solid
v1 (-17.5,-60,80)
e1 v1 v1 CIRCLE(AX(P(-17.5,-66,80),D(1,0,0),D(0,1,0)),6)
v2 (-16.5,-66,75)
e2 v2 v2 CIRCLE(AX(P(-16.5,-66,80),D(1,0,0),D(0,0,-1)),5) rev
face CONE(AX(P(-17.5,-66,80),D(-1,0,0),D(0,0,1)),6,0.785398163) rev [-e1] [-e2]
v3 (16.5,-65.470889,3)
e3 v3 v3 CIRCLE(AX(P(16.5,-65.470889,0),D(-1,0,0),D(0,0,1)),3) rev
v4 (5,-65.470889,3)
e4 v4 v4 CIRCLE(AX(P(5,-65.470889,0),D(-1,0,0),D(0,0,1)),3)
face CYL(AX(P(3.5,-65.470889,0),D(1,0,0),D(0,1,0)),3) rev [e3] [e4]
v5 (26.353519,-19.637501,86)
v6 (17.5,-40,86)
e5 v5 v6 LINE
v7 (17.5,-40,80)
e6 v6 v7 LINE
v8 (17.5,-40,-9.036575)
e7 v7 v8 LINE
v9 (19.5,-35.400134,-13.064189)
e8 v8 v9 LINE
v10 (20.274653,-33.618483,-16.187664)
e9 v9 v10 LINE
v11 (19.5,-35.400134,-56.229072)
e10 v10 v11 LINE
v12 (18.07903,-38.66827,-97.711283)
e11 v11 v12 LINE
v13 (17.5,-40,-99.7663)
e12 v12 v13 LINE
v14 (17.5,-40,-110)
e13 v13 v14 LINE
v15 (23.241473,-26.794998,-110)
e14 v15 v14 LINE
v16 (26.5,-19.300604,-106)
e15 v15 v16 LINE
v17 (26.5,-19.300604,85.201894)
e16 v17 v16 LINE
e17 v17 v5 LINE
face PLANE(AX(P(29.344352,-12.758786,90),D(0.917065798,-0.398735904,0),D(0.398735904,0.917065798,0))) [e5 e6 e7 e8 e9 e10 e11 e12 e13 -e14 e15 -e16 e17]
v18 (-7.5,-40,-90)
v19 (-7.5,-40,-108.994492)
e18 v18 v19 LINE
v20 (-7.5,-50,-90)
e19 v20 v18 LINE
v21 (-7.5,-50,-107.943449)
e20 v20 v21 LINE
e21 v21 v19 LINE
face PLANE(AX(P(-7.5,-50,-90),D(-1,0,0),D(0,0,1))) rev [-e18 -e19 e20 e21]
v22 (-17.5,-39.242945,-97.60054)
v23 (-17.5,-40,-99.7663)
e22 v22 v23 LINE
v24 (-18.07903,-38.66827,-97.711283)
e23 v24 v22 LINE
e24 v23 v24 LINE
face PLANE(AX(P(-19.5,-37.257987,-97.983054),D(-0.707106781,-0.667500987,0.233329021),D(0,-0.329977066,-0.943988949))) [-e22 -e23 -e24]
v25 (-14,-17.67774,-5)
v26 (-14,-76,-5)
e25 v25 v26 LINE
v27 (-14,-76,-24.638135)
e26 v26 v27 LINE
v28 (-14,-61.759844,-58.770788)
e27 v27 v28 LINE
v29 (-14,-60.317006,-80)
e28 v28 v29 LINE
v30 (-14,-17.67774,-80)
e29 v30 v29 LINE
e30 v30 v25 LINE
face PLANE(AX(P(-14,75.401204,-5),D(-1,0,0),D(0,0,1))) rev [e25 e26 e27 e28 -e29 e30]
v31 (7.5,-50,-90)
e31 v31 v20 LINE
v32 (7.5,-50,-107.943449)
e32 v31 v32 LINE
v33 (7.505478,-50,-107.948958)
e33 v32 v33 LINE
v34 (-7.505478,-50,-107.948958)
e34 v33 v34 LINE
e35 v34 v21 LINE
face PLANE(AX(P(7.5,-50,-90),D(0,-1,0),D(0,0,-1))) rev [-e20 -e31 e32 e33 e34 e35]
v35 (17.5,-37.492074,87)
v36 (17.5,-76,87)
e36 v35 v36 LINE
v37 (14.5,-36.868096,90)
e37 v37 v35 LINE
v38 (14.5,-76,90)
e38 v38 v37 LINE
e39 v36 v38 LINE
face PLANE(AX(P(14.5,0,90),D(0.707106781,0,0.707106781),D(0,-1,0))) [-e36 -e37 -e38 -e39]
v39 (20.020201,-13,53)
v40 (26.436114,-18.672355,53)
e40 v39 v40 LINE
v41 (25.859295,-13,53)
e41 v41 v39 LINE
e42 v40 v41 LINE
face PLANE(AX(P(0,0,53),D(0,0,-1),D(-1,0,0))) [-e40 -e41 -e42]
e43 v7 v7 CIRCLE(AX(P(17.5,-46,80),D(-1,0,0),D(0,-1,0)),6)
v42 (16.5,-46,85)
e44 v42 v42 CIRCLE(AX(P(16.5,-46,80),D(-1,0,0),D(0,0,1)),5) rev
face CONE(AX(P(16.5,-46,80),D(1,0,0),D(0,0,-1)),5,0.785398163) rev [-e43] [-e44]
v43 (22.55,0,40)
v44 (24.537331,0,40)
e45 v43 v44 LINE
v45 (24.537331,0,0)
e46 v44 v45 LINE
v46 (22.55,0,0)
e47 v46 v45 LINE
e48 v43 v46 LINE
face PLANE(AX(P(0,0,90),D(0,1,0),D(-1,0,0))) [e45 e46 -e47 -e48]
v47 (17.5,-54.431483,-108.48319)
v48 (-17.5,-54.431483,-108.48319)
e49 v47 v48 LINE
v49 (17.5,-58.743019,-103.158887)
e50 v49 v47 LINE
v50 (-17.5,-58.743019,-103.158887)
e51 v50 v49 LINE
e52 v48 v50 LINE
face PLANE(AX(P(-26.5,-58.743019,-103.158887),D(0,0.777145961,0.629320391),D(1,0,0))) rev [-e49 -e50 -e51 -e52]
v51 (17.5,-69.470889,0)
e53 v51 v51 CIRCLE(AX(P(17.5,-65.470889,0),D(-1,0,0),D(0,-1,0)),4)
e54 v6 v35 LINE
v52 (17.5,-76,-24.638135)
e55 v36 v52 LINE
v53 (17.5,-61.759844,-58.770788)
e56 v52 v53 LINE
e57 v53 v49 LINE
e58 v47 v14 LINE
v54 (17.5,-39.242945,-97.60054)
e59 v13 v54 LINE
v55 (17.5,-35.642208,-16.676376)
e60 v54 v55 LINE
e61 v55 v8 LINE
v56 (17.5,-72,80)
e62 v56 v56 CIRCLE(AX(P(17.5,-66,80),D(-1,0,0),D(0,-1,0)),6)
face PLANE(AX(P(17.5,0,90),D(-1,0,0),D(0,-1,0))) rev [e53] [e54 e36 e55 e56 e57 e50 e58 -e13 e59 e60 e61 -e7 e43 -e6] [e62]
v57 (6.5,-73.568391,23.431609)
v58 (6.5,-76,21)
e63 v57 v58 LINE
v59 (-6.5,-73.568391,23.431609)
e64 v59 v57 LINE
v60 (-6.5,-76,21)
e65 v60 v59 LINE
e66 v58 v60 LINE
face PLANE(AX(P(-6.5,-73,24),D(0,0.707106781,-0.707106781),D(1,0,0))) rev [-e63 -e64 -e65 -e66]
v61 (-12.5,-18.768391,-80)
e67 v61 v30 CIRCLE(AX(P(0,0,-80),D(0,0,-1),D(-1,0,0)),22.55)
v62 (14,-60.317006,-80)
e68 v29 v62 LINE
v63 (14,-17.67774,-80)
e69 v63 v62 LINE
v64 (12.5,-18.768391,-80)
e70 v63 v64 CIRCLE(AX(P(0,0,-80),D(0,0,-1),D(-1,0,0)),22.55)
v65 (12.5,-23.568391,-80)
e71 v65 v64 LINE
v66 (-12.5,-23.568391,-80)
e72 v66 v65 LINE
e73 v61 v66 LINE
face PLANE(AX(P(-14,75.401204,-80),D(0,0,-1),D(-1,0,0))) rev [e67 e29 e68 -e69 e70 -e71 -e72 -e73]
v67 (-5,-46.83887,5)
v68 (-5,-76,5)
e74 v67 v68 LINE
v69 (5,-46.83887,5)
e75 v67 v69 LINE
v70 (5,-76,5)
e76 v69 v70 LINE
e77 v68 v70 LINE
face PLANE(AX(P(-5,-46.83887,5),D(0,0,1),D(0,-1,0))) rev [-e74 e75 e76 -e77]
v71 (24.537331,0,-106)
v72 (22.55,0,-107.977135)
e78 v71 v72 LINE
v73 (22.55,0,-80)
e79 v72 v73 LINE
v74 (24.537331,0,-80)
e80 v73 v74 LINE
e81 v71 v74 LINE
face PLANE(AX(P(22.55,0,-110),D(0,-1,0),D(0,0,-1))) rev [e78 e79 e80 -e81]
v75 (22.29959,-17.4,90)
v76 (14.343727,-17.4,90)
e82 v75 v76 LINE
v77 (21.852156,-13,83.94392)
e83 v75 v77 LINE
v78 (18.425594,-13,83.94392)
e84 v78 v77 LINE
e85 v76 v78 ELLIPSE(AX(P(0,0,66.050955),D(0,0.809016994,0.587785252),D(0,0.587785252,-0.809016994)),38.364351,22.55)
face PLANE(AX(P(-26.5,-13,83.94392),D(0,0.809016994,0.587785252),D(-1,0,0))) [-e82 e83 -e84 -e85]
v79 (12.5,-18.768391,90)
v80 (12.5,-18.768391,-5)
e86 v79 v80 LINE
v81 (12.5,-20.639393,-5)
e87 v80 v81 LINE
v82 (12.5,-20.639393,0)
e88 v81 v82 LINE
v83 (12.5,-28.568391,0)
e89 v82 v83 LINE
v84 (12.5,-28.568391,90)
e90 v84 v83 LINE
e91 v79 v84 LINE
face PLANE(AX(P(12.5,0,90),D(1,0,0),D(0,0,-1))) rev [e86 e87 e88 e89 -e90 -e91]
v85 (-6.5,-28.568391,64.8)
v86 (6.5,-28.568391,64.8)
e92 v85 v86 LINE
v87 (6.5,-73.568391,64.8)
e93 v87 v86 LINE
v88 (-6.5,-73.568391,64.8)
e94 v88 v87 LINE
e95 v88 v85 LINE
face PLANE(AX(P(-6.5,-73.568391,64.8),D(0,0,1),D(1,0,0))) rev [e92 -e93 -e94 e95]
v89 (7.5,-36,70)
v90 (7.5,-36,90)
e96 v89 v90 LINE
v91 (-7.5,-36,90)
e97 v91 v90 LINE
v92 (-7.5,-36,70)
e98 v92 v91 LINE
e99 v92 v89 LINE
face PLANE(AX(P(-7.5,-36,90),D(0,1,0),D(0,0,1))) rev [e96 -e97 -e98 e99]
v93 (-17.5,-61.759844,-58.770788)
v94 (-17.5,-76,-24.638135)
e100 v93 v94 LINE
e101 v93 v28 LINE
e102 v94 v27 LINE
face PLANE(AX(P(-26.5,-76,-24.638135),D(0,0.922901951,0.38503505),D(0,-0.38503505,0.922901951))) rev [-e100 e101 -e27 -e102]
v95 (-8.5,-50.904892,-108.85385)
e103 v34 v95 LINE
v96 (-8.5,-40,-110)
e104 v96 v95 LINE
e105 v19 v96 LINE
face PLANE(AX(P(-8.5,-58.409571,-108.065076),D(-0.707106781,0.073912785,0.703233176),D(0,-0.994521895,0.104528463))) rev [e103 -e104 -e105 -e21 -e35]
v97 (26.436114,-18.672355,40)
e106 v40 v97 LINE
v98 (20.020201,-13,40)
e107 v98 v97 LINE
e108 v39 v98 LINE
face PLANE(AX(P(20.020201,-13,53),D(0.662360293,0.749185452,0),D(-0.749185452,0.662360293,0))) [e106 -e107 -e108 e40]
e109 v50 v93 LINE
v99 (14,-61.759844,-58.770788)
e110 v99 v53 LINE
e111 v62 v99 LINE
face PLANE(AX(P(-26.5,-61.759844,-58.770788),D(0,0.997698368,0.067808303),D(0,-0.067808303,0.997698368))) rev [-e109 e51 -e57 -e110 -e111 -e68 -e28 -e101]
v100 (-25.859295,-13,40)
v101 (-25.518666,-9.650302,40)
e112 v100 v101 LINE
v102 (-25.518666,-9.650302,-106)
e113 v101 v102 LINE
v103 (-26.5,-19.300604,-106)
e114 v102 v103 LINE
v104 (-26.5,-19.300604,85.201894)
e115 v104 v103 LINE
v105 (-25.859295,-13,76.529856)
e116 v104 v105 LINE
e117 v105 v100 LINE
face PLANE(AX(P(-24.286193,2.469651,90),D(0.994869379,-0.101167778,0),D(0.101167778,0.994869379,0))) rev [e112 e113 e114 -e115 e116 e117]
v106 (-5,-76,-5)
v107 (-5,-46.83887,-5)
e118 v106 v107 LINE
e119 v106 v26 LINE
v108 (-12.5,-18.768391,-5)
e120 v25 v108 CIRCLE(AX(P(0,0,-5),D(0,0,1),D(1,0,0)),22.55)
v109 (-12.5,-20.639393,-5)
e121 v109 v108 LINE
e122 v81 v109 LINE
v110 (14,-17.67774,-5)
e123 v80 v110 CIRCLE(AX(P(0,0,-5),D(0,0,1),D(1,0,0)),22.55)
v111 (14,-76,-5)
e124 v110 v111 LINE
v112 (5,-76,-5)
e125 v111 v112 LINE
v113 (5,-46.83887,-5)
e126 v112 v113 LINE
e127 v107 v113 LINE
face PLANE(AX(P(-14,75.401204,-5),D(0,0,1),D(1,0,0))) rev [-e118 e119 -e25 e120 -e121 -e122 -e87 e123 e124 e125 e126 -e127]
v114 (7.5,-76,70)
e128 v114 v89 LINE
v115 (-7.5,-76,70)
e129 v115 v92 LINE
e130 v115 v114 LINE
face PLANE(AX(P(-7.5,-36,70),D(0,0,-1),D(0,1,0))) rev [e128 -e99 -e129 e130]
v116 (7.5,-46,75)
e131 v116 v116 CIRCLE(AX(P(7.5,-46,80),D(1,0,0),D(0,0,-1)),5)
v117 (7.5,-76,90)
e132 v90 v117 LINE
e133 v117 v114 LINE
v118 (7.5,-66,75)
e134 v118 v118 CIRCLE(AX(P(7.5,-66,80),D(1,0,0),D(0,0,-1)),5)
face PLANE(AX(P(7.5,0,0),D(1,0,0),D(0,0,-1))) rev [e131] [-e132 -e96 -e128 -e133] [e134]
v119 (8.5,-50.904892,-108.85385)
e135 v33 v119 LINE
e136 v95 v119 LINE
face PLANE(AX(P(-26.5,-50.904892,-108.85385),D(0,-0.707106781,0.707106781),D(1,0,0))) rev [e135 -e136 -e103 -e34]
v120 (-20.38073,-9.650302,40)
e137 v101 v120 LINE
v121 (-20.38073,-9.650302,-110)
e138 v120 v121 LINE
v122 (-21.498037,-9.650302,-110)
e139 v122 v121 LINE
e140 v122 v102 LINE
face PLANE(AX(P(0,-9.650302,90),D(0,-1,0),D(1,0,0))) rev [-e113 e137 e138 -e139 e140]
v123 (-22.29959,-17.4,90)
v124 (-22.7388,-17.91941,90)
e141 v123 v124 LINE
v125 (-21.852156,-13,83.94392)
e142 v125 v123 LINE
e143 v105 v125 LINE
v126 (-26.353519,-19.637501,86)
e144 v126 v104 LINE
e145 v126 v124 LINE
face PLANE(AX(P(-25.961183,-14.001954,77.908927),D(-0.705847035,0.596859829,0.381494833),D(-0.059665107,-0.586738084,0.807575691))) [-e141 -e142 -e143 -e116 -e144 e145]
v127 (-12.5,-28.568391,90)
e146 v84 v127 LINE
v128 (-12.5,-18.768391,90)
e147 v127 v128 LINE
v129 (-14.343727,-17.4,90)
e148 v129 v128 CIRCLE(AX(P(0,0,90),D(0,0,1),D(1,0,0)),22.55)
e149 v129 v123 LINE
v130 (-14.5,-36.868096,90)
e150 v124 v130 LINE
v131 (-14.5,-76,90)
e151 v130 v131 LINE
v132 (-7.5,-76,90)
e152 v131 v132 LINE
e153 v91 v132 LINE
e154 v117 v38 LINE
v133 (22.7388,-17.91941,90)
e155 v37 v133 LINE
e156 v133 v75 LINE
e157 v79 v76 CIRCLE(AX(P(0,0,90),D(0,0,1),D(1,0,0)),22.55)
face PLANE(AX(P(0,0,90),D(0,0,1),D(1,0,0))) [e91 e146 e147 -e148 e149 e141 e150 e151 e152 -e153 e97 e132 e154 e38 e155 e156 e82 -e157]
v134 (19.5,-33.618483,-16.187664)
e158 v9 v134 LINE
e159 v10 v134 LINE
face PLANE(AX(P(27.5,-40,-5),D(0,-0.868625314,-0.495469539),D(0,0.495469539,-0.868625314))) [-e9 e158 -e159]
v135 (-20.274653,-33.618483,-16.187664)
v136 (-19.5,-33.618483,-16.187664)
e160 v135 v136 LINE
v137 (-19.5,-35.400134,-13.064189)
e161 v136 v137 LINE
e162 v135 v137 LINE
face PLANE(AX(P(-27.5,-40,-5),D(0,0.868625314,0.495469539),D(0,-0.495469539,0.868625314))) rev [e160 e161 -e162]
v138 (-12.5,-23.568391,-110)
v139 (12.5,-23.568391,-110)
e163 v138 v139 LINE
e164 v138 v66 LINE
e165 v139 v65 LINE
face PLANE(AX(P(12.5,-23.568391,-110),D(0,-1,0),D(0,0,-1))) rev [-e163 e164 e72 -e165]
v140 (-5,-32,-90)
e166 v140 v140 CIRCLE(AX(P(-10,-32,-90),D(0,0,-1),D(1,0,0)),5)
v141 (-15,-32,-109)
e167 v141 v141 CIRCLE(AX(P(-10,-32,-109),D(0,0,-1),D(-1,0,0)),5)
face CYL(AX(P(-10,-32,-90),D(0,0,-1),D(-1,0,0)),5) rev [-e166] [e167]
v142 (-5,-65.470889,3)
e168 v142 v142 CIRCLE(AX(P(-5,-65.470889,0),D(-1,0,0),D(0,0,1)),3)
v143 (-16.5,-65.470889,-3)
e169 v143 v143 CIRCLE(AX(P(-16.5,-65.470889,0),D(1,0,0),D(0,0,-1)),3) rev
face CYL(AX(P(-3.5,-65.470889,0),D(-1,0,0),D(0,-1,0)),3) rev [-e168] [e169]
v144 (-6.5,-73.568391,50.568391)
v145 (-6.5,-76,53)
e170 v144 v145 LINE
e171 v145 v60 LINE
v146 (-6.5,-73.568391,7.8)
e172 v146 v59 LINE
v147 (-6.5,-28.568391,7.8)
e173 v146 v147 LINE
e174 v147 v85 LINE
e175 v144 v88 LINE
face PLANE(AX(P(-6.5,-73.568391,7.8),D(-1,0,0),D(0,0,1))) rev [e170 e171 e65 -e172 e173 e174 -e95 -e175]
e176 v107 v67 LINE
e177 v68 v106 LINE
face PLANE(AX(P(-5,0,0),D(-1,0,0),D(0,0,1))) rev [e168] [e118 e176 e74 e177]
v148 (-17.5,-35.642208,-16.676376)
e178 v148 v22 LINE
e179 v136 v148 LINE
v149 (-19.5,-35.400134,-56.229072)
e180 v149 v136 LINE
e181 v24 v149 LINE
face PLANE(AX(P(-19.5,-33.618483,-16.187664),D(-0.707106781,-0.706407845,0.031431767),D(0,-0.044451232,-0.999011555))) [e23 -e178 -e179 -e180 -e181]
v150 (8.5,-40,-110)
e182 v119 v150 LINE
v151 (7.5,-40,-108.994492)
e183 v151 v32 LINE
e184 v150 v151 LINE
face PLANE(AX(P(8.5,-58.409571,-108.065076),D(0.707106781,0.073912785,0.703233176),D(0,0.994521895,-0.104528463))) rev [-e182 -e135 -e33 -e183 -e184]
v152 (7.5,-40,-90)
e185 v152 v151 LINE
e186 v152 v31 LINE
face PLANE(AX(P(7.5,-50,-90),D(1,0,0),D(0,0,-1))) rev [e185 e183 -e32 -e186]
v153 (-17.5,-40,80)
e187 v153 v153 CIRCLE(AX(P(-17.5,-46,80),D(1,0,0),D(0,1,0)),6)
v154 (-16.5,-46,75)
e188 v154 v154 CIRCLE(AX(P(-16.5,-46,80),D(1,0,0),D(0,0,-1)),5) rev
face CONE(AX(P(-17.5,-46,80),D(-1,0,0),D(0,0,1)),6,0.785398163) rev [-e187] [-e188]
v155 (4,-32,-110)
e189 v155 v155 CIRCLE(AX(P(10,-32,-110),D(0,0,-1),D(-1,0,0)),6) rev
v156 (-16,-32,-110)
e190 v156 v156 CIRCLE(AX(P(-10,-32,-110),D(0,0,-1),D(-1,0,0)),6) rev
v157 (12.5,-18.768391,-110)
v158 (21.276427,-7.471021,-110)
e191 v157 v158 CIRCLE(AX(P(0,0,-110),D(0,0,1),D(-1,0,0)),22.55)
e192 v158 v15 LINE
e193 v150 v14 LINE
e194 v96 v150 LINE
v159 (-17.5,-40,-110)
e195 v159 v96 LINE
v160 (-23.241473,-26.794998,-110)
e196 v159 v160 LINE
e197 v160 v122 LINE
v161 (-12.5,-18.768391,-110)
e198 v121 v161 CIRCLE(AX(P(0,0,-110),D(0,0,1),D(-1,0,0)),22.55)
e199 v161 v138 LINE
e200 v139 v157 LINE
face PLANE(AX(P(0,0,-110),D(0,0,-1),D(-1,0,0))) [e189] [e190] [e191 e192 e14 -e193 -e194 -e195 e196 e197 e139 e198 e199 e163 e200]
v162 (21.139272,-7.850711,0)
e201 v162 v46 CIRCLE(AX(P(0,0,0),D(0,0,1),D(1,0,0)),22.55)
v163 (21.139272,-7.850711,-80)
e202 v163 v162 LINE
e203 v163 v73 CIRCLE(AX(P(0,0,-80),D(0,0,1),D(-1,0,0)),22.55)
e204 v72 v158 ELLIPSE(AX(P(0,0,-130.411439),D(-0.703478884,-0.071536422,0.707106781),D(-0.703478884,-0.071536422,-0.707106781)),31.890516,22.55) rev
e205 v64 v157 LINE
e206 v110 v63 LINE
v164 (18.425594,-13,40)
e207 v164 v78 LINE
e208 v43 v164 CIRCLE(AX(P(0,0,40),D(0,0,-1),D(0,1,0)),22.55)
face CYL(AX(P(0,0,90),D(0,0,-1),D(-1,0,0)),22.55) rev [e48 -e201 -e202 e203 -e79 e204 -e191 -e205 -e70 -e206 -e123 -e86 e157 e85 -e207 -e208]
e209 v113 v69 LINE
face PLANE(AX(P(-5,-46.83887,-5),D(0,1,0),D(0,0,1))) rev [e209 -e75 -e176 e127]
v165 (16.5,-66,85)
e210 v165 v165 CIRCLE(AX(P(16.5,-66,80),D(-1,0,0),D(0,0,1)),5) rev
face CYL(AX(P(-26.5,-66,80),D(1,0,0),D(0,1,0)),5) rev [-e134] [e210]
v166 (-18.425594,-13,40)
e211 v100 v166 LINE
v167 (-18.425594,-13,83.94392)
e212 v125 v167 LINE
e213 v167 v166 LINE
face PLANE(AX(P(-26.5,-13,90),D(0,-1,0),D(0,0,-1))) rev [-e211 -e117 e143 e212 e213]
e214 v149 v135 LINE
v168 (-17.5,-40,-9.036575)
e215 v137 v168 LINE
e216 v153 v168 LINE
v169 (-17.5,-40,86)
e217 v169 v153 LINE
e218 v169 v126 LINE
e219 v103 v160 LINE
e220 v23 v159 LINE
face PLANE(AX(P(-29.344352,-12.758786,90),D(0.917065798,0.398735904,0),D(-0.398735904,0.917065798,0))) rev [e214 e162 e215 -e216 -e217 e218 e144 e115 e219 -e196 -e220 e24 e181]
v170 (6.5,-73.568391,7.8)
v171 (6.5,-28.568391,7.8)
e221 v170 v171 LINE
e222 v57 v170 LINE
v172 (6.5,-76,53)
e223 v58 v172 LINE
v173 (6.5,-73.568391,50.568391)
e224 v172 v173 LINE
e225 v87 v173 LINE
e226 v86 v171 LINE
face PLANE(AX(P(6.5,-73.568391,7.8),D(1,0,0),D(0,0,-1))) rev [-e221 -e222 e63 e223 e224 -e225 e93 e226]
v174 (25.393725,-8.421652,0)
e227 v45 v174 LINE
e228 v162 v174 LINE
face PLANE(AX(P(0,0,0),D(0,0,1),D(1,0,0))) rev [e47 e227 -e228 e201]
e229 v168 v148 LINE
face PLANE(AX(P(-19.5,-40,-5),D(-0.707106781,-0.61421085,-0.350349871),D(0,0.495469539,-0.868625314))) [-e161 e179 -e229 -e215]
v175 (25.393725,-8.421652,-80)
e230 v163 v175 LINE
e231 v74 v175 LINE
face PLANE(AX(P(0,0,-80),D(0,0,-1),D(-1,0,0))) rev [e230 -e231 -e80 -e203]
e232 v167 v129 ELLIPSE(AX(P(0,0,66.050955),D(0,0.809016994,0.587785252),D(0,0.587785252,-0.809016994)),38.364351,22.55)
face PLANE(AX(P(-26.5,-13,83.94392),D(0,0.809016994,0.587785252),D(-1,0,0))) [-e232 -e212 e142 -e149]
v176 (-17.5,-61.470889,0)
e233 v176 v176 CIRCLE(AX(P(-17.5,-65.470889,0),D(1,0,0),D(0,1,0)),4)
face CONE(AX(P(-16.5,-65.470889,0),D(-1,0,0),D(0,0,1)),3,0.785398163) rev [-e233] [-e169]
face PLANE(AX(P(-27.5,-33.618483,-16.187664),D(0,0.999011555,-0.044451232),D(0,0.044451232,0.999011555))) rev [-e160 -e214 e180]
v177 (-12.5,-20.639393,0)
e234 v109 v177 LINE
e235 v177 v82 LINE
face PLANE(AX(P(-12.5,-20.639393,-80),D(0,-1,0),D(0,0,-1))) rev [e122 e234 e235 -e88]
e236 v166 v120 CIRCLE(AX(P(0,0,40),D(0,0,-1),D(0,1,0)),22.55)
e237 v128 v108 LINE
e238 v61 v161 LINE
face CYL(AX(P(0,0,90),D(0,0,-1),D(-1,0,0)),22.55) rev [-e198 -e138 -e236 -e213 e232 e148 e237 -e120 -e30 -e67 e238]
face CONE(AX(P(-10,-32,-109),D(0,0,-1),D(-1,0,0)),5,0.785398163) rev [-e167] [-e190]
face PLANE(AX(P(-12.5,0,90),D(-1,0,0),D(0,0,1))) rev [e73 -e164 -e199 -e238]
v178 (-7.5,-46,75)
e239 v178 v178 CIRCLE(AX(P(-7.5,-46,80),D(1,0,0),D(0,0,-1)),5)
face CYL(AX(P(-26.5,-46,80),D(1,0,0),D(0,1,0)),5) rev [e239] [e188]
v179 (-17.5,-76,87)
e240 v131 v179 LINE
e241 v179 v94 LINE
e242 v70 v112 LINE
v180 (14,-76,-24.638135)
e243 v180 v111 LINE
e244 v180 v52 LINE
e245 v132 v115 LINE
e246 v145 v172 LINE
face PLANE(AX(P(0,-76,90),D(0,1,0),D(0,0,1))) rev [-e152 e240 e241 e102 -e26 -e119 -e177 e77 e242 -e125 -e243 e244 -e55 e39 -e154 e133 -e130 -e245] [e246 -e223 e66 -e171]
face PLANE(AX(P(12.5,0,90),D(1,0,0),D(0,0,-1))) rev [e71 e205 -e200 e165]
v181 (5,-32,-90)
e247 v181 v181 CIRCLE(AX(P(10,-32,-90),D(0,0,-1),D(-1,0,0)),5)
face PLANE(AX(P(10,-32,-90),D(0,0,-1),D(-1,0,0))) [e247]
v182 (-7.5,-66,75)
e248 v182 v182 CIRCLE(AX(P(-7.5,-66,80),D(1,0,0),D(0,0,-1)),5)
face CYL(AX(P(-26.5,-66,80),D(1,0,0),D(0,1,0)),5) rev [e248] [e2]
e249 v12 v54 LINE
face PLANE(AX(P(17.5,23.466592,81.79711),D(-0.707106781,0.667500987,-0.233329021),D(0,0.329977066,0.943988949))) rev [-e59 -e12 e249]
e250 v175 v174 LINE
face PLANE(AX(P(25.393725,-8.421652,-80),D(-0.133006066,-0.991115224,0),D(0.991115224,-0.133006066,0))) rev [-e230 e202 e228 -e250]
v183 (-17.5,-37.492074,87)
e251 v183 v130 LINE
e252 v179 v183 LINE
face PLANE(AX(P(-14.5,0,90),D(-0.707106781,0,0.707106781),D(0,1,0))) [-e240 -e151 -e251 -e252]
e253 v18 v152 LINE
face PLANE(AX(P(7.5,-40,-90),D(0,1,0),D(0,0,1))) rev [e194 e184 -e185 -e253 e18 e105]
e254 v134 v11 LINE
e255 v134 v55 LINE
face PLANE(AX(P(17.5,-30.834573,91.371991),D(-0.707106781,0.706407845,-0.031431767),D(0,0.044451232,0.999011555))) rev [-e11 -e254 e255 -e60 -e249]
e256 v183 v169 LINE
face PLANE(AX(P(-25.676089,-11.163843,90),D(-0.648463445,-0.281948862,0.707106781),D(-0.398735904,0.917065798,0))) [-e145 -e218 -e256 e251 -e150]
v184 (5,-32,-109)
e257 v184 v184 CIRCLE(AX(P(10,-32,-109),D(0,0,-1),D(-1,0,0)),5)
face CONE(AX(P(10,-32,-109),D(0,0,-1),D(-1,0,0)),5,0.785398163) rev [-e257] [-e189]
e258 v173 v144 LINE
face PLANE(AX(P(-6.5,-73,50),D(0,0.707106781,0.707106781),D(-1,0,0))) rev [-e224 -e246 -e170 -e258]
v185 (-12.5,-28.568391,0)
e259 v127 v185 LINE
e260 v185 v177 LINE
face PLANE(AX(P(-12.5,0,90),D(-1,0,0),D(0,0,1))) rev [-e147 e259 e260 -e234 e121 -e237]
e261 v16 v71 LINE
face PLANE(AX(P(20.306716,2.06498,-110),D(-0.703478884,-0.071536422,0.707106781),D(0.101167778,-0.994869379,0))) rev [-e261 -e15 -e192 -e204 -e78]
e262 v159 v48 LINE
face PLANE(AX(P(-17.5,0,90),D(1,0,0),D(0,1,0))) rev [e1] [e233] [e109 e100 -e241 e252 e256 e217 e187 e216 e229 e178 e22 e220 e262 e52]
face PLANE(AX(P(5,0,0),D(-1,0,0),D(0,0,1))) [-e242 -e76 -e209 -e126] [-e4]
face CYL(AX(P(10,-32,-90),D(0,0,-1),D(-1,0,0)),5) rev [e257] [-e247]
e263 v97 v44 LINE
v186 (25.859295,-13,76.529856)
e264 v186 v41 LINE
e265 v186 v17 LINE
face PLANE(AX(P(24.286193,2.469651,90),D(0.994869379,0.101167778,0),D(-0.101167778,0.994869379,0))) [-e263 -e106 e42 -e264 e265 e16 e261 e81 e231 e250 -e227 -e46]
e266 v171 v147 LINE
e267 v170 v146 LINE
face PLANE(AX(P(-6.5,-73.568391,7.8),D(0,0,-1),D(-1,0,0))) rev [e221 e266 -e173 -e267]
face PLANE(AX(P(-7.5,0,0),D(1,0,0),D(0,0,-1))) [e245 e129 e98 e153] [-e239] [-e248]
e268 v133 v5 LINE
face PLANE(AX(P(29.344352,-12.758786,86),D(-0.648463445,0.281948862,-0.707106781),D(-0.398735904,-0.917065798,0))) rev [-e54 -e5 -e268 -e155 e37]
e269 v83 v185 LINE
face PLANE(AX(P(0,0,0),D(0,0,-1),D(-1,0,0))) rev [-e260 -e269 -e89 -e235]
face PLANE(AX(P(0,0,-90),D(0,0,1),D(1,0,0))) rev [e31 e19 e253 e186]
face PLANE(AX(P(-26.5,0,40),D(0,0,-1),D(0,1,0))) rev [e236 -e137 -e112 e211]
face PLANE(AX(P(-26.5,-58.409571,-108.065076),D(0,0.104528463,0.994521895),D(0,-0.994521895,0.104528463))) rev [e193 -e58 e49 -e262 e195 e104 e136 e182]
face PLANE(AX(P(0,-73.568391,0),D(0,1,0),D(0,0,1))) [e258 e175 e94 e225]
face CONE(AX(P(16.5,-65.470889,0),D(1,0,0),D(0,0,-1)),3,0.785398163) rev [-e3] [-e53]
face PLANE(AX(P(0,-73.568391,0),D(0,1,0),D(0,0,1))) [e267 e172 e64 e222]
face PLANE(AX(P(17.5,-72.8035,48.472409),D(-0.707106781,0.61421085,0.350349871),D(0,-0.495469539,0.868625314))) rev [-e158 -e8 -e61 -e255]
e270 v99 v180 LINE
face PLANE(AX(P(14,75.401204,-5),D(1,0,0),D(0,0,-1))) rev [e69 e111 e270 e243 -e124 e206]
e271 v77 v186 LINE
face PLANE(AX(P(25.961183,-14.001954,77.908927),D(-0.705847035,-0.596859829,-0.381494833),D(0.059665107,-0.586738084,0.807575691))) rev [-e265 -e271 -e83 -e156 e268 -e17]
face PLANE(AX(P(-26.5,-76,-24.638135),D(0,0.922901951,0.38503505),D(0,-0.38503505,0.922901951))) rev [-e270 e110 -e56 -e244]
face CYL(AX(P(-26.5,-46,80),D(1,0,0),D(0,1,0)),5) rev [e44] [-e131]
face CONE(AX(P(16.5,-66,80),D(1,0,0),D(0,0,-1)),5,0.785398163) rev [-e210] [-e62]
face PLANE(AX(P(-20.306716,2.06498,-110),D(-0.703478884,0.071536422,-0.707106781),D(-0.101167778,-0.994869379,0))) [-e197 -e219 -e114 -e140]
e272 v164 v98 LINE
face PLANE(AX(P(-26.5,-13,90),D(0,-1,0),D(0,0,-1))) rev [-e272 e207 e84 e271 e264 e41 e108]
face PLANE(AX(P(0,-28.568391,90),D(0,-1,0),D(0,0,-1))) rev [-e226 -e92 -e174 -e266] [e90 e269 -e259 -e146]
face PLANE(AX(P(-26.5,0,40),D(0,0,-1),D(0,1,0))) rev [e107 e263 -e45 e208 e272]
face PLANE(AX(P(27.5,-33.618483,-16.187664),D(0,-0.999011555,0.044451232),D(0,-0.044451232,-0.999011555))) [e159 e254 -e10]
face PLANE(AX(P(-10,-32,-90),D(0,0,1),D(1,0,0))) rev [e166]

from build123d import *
from OCP.BRepFilletAPI import BRepFilletAPI_MakeChamfer

# Parameters (mm, degrees)
EXTRUDE_1_DEPTH           = 90
SKETCH_3_W                = 13
SKETCH_3_H                = 57
CUT_EXTRUDE_1_DEPTH       = 45
CUT_EXTRUDE_2_REACH       = 121.225
SKETCH_4_W                = 13
SKETCH_4_H                = 26
CHAMFER_1_SIZE            = 3
CUT_EXTRUDE_3_DEPTH       = 121.740424051
CUT_EXTRUDE_3_DEPTH_BACK  = 121.740424051
SKETCH_5_W                = 50
SKETCH_5_H                = 13
CUT_EXTRUDE_5_DEPTH       = 13
EXTRUDE_START             = 80
EXTRUDE_3_DEPTH           = 80
EXTRUDE_START_2           = 30
EXTRUDE_4_DEPTH           = 30
CUT_EXTRUDE_7_REACH       = 138.302
SKETCH_13_W               = 28
SKETCH_13_H               = 75
SKETCH_14_W               = 10
SKETCH_14_H               = 29.16112988
CUT_EXTRUDE_8_DEPTH       = 5
SKETCH_15_R               = 2
CUT_EXTRUDE_9_DEPTH       = 141.755106479
SKETCH_16_R               = 3
CUT_EXTRUDE_10_DEPTH      = 14
CUT_EXTRUDE_START         = -14
SKETCH_17_R               = 3
CUT_EXTRUDE_11_DEPTH      = 14
CUT_EXTRUDE_12_DEPTH      = 137.302054277
CUT_EXTRUDE_12_DEPTH_BACK = 137.302054277
CHAMFER_2_SIZE            = 4.4
CHAMFER_2_SIZE2           = 6.05608045
CUT_EXTRUDE_13_DEPTH      = 10
CHAMFER_3_SIZE            = 2
CHAMFER_4_SIZE            = 4
CHAMFER_4_SIZE2           = 4.917507249
CHAMFER_5_SIZE            = 4
CHAMFER_5_EDGE_2_SIZE     = 4
CHAMFER_5_EDGE_3_SIZE     = 4
CHAMFER_5_EDGE_3_SIZE2    = 4.372547618
CHAMFER_5_EDGE_4_SIZE     = 4
CHAMFER_5_EDGE_4_SIZE2    = 4.372547618
CHAMFER_5_EDGE_5_SIZE     = 4
CHAMFER_5_EDGE_6_SIZE     = 4
SKETCH_25_W               = 20
SKETCH_25_H               = 40
CUT_EXTRUDE_14_DEPTH      = 7.5
SKETCH_26_R               = 5
SKETCH_26_W               = 15
SKETCH_26_H               = 10
CUT_EXTRUDE_15_DEPTH      = 20
CHAMFER_6_SIZE            = 1
CHAMFER_6_SIZE2           = 0.909876415
SKETCH_28_R               = 5
CUT_EXTRUDE_16_DEPTH      = 141.755106479
CHAMFER_7_SIZE            = 1
CHAMFER_8_SIZE            = 3


# Some blends are built 0.0001 mm under size
with BuildPart() as part:
    # 스케치2 → 보스-돌출1 (new body)
    with BuildSketch(Plane.XY):
        with BuildLine():
            ThreePointArc((20.380730277, -9.650302243), (17.060788125, -14.745575898), (12.5, -18.768390981))
            Line((12.5, -18.768390981), (12.5, -28.568390981))
            Line((12.5, -28.568390981), (-12.5, -28.568390981))
            Line((-12.5, -28.568390981), (-12.5, -18.768390981))
            ThreePointArc((-12.5, -18.768390981), (-17.060788125, -14.745575898), (-20.380730277, -9.650302243))
            Line((-20.380730277, -9.650302243), (-25.518665511, -9.650302243))
            Line((-25.518665511, -9.650302243), (-26.5, -19.300604486))
            Line((-26.5, -19.300604486), (-17.5, -40))
            Line((-17.5, -40), (-17.5, -76))
            Line((-17.5, -76), (17.5, -76))
            Line((17.5, -76), (17.5, -40))
            Line((17.5, -40), (26.5, -19.300604486))
            Line((26.5, -19.300604486), (24.537331021, 0))
            Line((24.537331021, 0), (22.55, 0))
            ThreePointArc((22.55, 0), (22.000999611, -4.945555189), (20.380730277, -9.650302243))
        make_face()
    extrude(amount=EXTRUDE_1_DEPTH)

    # 스케치3 → 컷-돌출1 (cut)
    with BuildSketch(Plane(origin=(0, -28.568390981, 0), x_dir=(1, 0, 0), z_dir=(0, 1, 0))):
        with Locations((0, -36.3)):
            Rectangle(SKETCH_3_W, SKETCH_3_H)
    extrude(amount=-CUT_EXTRUDE_1_DEPTH, mode=Mode.SUBTRACT)

    # 스케치4 → 컷-돌출2 (cut, up to next)
    with BuildSketch(Plane(origin=(0, -73.568390981, 0), x_dir=(1, 0, 0), z_dir=(0, 1, 0)), mode=Mode.PRIVATE) as cut_extrude_2_sk1:
        with Locations((0, -37)):
            Rectangle(SKETCH_4_W, SKETCH_4_H)
    cut_extrude_2_tool1 = extrude(cut_extrude_2_sk1.sketch, amount=-CUT_EXTRUDE_2_REACH, mode=Mode.PRIVATE) & part.part
    add(cut_extrude_2_tool1.solids().sort_by_distance((0, -73.568391, 37))[0], mode=Mode.SUBTRACT)

    # 모따기1
    # the kernel refuses this chamfer: 3 mm, written as the material it takes off along each edge
    with BuildSketch(Plane(origin=(6.5, -76, 24), x_dir=(0, -0.027495876610586768, -0.9996219169112968), z_dir=(-1, 0, 0)), Plane(origin=(-6.5, -76, 50), x_dir=(0, -0.027495876610586768, 0.9996219169112968), z_dir=(1, 0, 0))) as chamfer_1_piece_1:
        Polygon((CHAMFER_1_SIZE * 0.999621916911, -CHAMFER_1_SIZE * 0.0274958766106), (-CHAMFER_1_SIZE * 0.0274958766106, -CHAMFER_1_SIZE * 0.999621916911), (0, 0), align=None)
    extrude(amount=13, mode=Mode.SUBTRACT)

    # 스케치5 → 컷-돌출3 (cut, two sides: drawn at the far end of the back side and taken through both)
    with BuildSketch(Plane(origin=(0, 0, 0), x_dir=(0, 0, -1), z_dir=(1, 0, 0)).offset(-CUT_EXTRUDE_3_DEPTH_BACK)):
        with Locations((-65, -6.5)):
            Rectangle(SKETCH_5_W, SKETCH_5_H)
    extrude(amount=CUT_EXTRUDE_3_DEPTH + CUT_EXTRUDE_3_DEPTH_BACK, mode=Mode.SUBTRACT)

    # 스케치7 → 컷-돌출5 (cut)
    with BuildSketch(Plane.XY.offset(40)):
        Polygon((20.020200806, -13), (26.436113625, -18.672355064), (25.859294628, -13), align=None)
    extrude(amount=CUT_EXTRUDE_5_DEPTH, mode=Mode.SUBTRACT)

    # 스케치9 → 보스-돌출3 (add)
    with BuildSketch(Plane(origin=(0, 0, 0), x_dir=(-1, 0, 0), z_dir=(0, 0, -1)).offset(EXTRUDE_START)):
        with BuildLine():
            Line((-25.393724686, -8.421652141), (-21.139272206, -7.850711472))
            ThreePointArc((-21.139272206, -7.850711472), (-17.683299751, -13.992977164), (-12.5, -18.768390981))
            Line((-12.5, -18.768390981), (-12.5, -20.639392703))
            Line((-12.5, -20.639392703), (12.5, -20.639392703))
            Line((12.5, -20.639392703), (12.5, -18.768390981))
            ThreePointArc((12.5, -18.768390981), (17.060788125, -14.745575898), (20.380730277, -9.650302243))
            Line((20.380730277, -9.650302243), (25.518665511, -9.650302243))
            Line((25.518665511, -9.650302243), (26.5, -19.300604486))
            Line((26.5, -19.300604486), (17.5, -40))
            Line((17.5, -40), (17.5, -76))
            Line((17.5, -76), (-17.5, -76))
            Line((-17.5, -76), (-17.5, -40))
            Line((-17.5, -40), (-26.5, -19.300604486))
            Line((-26.5, -19.300604486), (-25.393724686, -8.421652141))
        make_face()
    extrude(amount=-EXTRUDE_3_DEPTH)

    # 스케치12 → 보스-돌출4 (add)
    with BuildSketch(Plane(origin=(0, 0, -80), x_dir=(-1, 0, 0), z_dir=(0, 0, -1)).offset(EXTRUDE_START_2)):
        with BuildLine():
            Line((-12.5, -23.568390981), (12.5, -23.568390981))
            Line((12.5, -23.568390981), (12.5, -18.768390981))
            ThreePointArc((12.5, -18.768390981), (17.060788125, -14.745575898), (20.380730277, -9.650302243))
            Line((20.380730277, -9.650302243), (25.518665511, -9.650302243))
            Line((25.518665511, -9.650302243), (26.5, -19.300604486))
            Line((26.5, -19.300604486), (17.5, -40))
            Line((17.5, -40), (17.5, -76))
            Line((17.5, -76), (-17.5, -76))
            Line((-17.5, -76), (-17.5, -40))
            Line((-17.5, -40), (-26.5, -19.300604486))
            Line((-26.5, -19.300604486), (-25.393724686, -8.421652141))
            Line((-25.393724686, -8.421652141), (-24.537331021, 0))
            Line((-24.537331021, 0), (-22.55, 0))
            ThreePointArc((-22.55, 0), (-22.194516082, -3.98822716), (-21.139272206, -7.850711472))
            ThreePointArc((-21.139272206, -7.850711472), (-17.683299751, -13.992977164), (-12.5, -18.768390981))
            Line((-12.5, -18.768390981), (-12.5, -23.568390981))
        make_face()
    extrude(amount=-EXTRUDE_4_DEPTH)

    # 컷-돌출7: up to this face of the body (flat: up to its plane)
    cut_extrude_7_end = Plane(part.part.faces().sort_by_distance((23.266498446, -8.136181806, -40))[0])
    # 스케치13 → 컷-돌출7 (cut, up to the picked face)
    with BuildSketch(Plane.XZ.offset(76), mode=Mode.PRIVATE) as cut_extrude_7_sk1:
        with Locations((0, -42.5)):
            Rectangle(SKETCH_13_W, SKETCH_13_H)
    cut_extrude_7_tool1 = split(extrude(cut_extrude_7_sk1.sketch, amount=-CUT_EXTRUDE_7_REACH, mode=Mode.PRIVATE), bisect_by=cut_extrude_7_end, keep=Keep.BOTH, mode=Mode.PRIVATE)
    add(cut_extrude_7_tool1.solids().sort_by(Axis((0, -76, -42.5), (0, 1, 0)))[0], mode=Mode.SUBTRACT)

    # 스케치14 → 컷-돌출8 (cut, symmetric)
    with BuildSketch(Plane(origin=(0, 0, 0), x_dir=(0, 0, -1), z_dir=(1, 0, 0))):
        with Locations((0, -61.41943506)):
            Rectangle(SKETCH_14_W, SKETCH_14_H)
    extrude(amount=CUT_EXTRUDE_8_DEPTH, both=True, mode=Mode.SUBTRACT)

    # 스케치15 → 컷-돌출9 (cut, through all)
    with BuildSketch(Plane(origin=(17.5, 0, 0), x_dir=(0, 0, -1), z_dir=(1, 0, 0))):
        with Locations(Location((0, -65.470889295, 0), (0, 0, 90))):
            Circle(SKETCH_15_R)
    extrude(amount=-CUT_EXTRUDE_9_DEPTH, mode=Mode.SUBTRACT)

    # 스케치16 → 컷-돌출10 (cut)
    with BuildSketch(Plane(origin=(17.5, 0, 0), x_dir=(0, 0, -1), z_dir=(1, 0, 0))):
        with Locations(Location((0, -65.470889295, 0), (0, 0, 90))):
            Circle(SKETCH_16_R)
    extrude(amount=-CUT_EXTRUDE_10_DEPTH, mode=Mode.SUBTRACT)

    # 스케치17 → 컷-돌출11 (cut)
    with BuildSketch(Plane.ZY.offset(17.5).offset(CUT_EXTRUDE_START)):
        with Locations(Location((0, -65.470889295, 0), (0, 0, 90))):
            Circle(SKETCH_17_R)
    extrude(amount=CUT_EXTRUDE_11_DEPTH, mode=Mode.SUBTRACT)

    # 스케치20 → 컷-돌출12 (cut, two sides: drawn at the far end of the back side and taken through both)
    with BuildSketch(Plane(origin=(0, 0, 0), x_dir=(0, 0, -1), z_dir=(1, 0, 0)).offset(-CUT_EXTRUDE_12_DEPTH_BACK)):
        Polygon((24.638134981, -76), (58.770788474, -61.759843807), (108.06507615, -58.409570701), (110, -40), (110, -58.885675635), (110, -79), align=None)
    extrude(amount=CUT_EXTRUDE_12_DEPTH + CUT_EXTRUDE_12_DEPTH_BACK, mode=Mode.SUBTRACT)

    # 모따기2
    chamfer_2_edges = [part.edges().sort_by_distance(p)[0] for p in [
        (22.142444121, -13, 90),
        (-22.142444121, -13, 90),
    ]]
    chamfer_2_side = [part.faces().sort_by_distance(p)[0] for p in [
        (0, -46.360145524, 90),
    ]]
    chamfer(chamfer_2_edges, length=CHAMFER_2_SIZE, length2=CHAMFER_2_SIZE2, reference=chamfer_2_side[0])

    # 스케치22 → 컷-돌출13 (cut)
    with BuildSketch(Plane(origin=(17.5, 0, 0), x_dir=(0, 0, -1), z_dir=(1, 0, 0))):
        Polygon((5, -40), (16.187664279, -33.618483394), (97.983053558, -37.257986642), (105.827326917, -40), align=None)
    cut_extrude_13 = extrude(amount=CUT_EXTRUDE_13_DEPTH, mode=Mode.SUBTRACT)

    # 대칭 복사1: 컷-돌출13 across plane
    add(cut_extrude_13.mirror(Plane(origin=(0, 0, 0), x_dir=(0, 0, 1), z_dir=(1, 0, 0))), mode=Mode.SUBTRACT)

    # 모따기3
    # the kernel refuses this chamfer: 2 mm, written as the material it adds along each edge
    with BuildSketch(Plane(origin=(-17.5, -42.54838117, -0.532342115), x_dir=(0.02749587661058563, -0.8682969012521734, -0.4952822105075944), z_dir=(0, 0.4954695391613189, -0.8686253137937383))) as chamfer_3_piece_1_section:
        Polygon((CHAMFER_3_SIZE * 0.999621916911, CHAMFER_3_SIZE * 0.0274958766106), (-CHAMFER_3_SIZE * 0.0274958766106, CHAMFER_3_SIZE * 0.999621916911), (0, 0), align=None)
    chamfer_3_piece_1 = extrude(amount=23.166467438, mode=Mode.PRIVATE)
    chamfer_3_piece_1 = split(chamfer_3_piece_1, bisect_by=Plane(origin=(-18.981499347, -36.592651008, -13.119815706), z_dir=(0.9170657984648163, 0.39873590418482396, 0)), keep=Keep.TOP, mode=Mode.PRIVATE)
    add(chamfer_3_piece_1)
    with BuildSketch(Plane(origin=(-17.5, -33.389854441, -11.049382234), x_dir=(0.027495876610585623, -0.9986338461144253, 0.04443442543935536), z_dir=(0, -0.04445123169833253, -0.9990115554889749))) as chamfer_3_piece_2_section:
        Polygon((CHAMFER_3_SIZE * 0.999621916911, CHAMFER_3_SIZE * 0.0274958766106), (-CHAMFER_3_SIZE * 0.0274958766106, CHAMFER_3_SIZE * 0.999621916911), (0, 0), align=None)
    chamfer_3_piece_2 = extrude(amount=92.16305143, mode=Mode.PRIVATE)
    chamfer_3_piece_2 = split(chamfer_3_piece_2, bisect_by=Plane(origin=(-19.031912041, -36.476705196, -55.876070021), z_dir=(0.9170657984648163, 0.39873590418482396, 0)), keep=Keep.TOP, mode=Mode.PRIVATE)
    add(chamfer_3_piece_2)
    with BuildSketch(Plane(origin=(-17.5, -35.560793827, -93.127772916), x_dir=(0.02749587661058555, -0.9436320427706771, 0.3298523072919975), z_dir=(0, -0.3299770660403273, -0.9439889490282275))) as chamfer_3_piece_3_section:
        Polygon((CHAMFER_3_SIZE * 0.999621916911, CHAMFER_3_SIZE * 0.0274958766106), (-CHAMFER_3_SIZE * 0.0274958766106, CHAMFER_3_SIZE * 0.999621916911), (0, 0), align=None)
    chamfer_3_piece_3 = extrude(amount=18.596440839, mode=Mode.PRIVATE)
    chamfer_3_piece_3 = split(chamfer_3_piece_3, bisect_by=Plane(origin=(-18.228365735, -38.32480773, -98.041579584), z_dir=(0.9170657984648163, 0.39873590418482396, 0)), keep=Keep.TOP, mode=Mode.PRIVATE)
    add(chamfer_3_piece_3)
    with BuildSketch(Plane(origin=(17.5, -35.560793827, -93.127772916), x_dir=(-0.027495876610583912, -0.9436320427706772, 0.3298523072919975), z_dir=(0, -0.3299770660403273, -0.9439889490282275))) as chamfer_3_piece_4_section:
        Polygon((CHAMFER_3_SIZE * 0.999621916911, -CHAMFER_3_SIZE * 0.0274958766106), (-CHAMFER_3_SIZE * 0.0274958766106, -CHAMFER_3_SIZE * 0.999621916911), (0, 0), align=None)
    chamfer_3_piece_4 = extrude(amount=18.596440839, mode=Mode.PRIVATE)
    chamfer_3_piece_4 = split(chamfer_3_piece_4, bisect_by=Plane(origin=(18.228365735, -38.32480773, -98.041579584), z_dir=(-0.9170657984648163, 0.39873590418482396, 0)), keep=Keep.TOP, mode=Mode.PRIVATE)
    add(chamfer_3_piece_4)
    with BuildSketch(Plane(origin=(17.5, -33.389854441, -11.049382234), x_dir=(-0.027495876610585716, -0.9986338461144253, 0.04443442543935535), z_dir=(0, -0.04445123169833253, -0.9990115554889749))) as chamfer_3_piece_5_section:
        Polygon((CHAMFER_3_SIZE * 0.999621916911, -CHAMFER_3_SIZE * 0.0274958766106), (-CHAMFER_3_SIZE * 0.0274958766106, -CHAMFER_3_SIZE * 0.999621916911), (0, 0), align=None)
    chamfer_3_piece_5 = extrude(amount=92.16305143, mode=Mode.PRIVATE)
    chamfer_3_piece_5 = split(chamfer_3_piece_5, bisect_by=Plane(origin=(19.031912041, -36.476705196, -55.876070021), z_dir=(-0.9170657984648163, 0.39873590418482396, 0)), keep=Keep.TOP, mode=Mode.PRIVATE)
    add(chamfer_3_piece_5)
    with BuildSketch(Plane(origin=(17.5, -42.54838117, -0.532342115), x_dir=(-0.027495876610583985, -0.8682969012521733, -0.4952822105075944), z_dir=(0, 0.4954695391613189, -0.8686253137937383))) as chamfer_3_piece_6_section:
        Polygon((CHAMFER_3_SIZE * 0.999621916911, -CHAMFER_3_SIZE * 0.0274958766106), (-CHAMFER_3_SIZE * 0.0274958766106, -CHAMFER_3_SIZE * 0.999621916911), (0, 0), align=None)
    chamfer_3_piece_6 = extrude(amount=23.166467438, mode=Mode.PRIVATE)
    chamfer_3_piece_6 = split(chamfer_3_piece_6, bisect_by=Plane(origin=(18.981499347, -36.592651008, -13.119815706), z_dir=(-0.9170657984648163, 0.39873590418482396, 0)), keep=Keep.TOP, mode=Mode.PRIVATE)
    add(chamfer_3_piece_6)

    # 모따기4
    chamfer_4_edges = [part.edges().sort_by_distance(p)[0] for p in [
        (0, -58.409570701, -108.06507615),
    ]]
    chamfer_4_side = [part.faces().sort_by_distance(p)[0] for p in [
        (0, -49.20478535, -109.032538075),
    ]]
    chamfer(chamfer_4_edges, length=CHAMFER_4_SIZE, length2=CHAMFER_4_SIZE2, reference=chamfer_4_side[0])

    # 모따기5
    chamfer_5_edges = [part.edges().sort_by_distance(p)[0] for p in [
        (-26.009332755, -14.475453365, -110),
    ]]
    chamfer(chamfer_5_edges, length=CHAMFER_5_SIZE)

    # 모따기5 edge 2
    chamfer_5_edge_2_edges = [part.edges().sort_by_distance(p)[0] for p in [
        (25.518665511, -9.650302243, -110),
    ]]
    chamfer(chamfer_5_edge_2_edges, length=CHAMFER_5_EDGE_2_SIZE)

    # 모따기5 edge 3
    chamfer_5_edge_3_edges = [part.edges().sort_by_distance(p)[0] for p in [
        (26.083011546, -15.2, 86.971959775),
    ]]
    chamfer_5_edge_3_side = [part.faces().sort_by_distance(p)[0] for p in [
        (21.25365505, -15.373477723, 87.210731376),
    ]]
    chamfer(chamfer_5_edge_3_edges, length=CHAMFER_5_EDGE_3_SIZE, length2=CHAMFER_5_EDGE_3_SIZE2, reference=chamfer_5_edge_3_side[0])

    # 모따기5 edge 4
    chamfer_5_edge_4_edges = [part.edges().sort_by_distance(p)[0] for p in [
        (-26.083011546, -15.2, 86.971959775),
    ]]
    chamfer_5_edge_4_side = [part.faces().sort_by_distance(p)[0] for p in [
        (-21.25365505, -15.373477723, 87.210731376),
    ]]
    chamfer(chamfer_5_edge_4_edges, length=CHAMFER_5_EDGE_4_SIZE, length2=CHAMFER_5_EDGE_4_SIZE2, reference=chamfer_5_edge_4_side[0])

    # 모따기5 edge 5
    chamfer_5_edge_5_edges = [part.edges().sort_by_distance(p)[0] for p in [
        (-22, -29.650302243, 90),
    ]]
    chamfer(chamfer_5_edge_5_edges, length=CHAMFER_5_EDGE_5_SIZE)

    # 모따기5 edge 6
    chamfer_5_edge_6_edges = [part.edges().sort_by_distance(p)[0] for p in [
        (22, -29.650302243, 90),
    ]]
    chamfer(chamfer_5_edge_6_edges, length=CHAMFER_5_EDGE_6_SIZE)

    # 스케치25 → 컷-돌출14 (cut, symmetric)
    with BuildSketch(Plane(origin=(0, 0, 0), x_dir=(0, 0, -1), z_dir=(1, 0, 0))):
        with Locations((-80, -56)):
            Rectangle(SKETCH_25_W, SKETCH_25_H)
    extrude(amount=CUT_EXTRUDE_14_DEPTH, both=True, mode=Mode.SUBTRACT)

    # 스케치26 → 컷-돌출15 (cut)
    with BuildSketch(Plane(origin=(0, 0, -110), x_dir=(-1, 0, 0), z_dir=(0, 0, -1))):
        with Locations((-10, -32)):
            Circle(SKETCH_26_R)
        with Locations(Location((10, -32, 0), (0, 0, 180))):
            Circle(SKETCH_26_R)
        with Locations((0, -45)):
            Rectangle(SKETCH_26_W, SKETCH_26_H)
    extrude(amount=-CUT_EXTRUDE_15_DEPTH, mode=Mode.SUBTRACT)

    # 모따기6: one chamfer whose edges measure the first distance from different faces: ONE call of the kernel's chamfer builder (chamfer() names one face for all edges)
    chamfer_6_edges_1 = [part.edges().sort_by_distance(p)[0] for p in [
        (15, -32, -110),
        (-15, -32, -110),
        (7.5, -45, -109.474478824),
        (-7.5, -45, -109.474478824),
    ]]
    chamfer_6_edges_2 = [part.edges().sort_by_distance(p)[0] for p in [
        (0, -50, -108.948957647),
    ]]
    chamfer_6_side_2 = [part.faces().sort_by_distance(p)[0] for p in [
        (0, -50, -99.474478824),
    ]]
    chamfer_6 = BRepFilletAPI_MakeChamfer(part.part.solid().wrapped)
    for e in chamfer_6_edges_1:
        chamfer_6.Add(CHAMFER_6_SIZE, e.wrapped)
    for e in chamfer_6_edges_2:
        chamfer_6.Add(CHAMFER_6_SIZE, CHAMFER_6_SIZE2, e.wrapped, chamfer_6_side_2[0].wrapped)  # the first distance lies on this face
    add(Compound.cast(chamfer_6.Shape()), mode=Mode.REPLACE)

    # 스케치28 → 컷-돌출16 (cut, through all)
    with BuildSketch(Plane(origin=(17.5, 0, 0), x_dir=(0, 0, -1), z_dir=(1, 0, 0))):
        with Locations(Location((-80, -46, 0), (0, 0, 90))):
            Circle(SKETCH_28_R)
        with Locations(Location((-80, -66, 0), (0, 0, 90))):
            Circle(SKETCH_28_R)
    extrude(amount=-CUT_EXTRUDE_16_DEPTH, mode=Mode.SUBTRACT)

    # 모따기7
    chamfer_7_edges = [part.edges().sort_by_distance(p)[0] for p in [
        (17.5, -68.470889295, 0),
        (-17.5, -68.470889295, 0),
        (-17.5, -51, 80),
        (17.5, -51, 80),
        (-17.5, -71, 80),
        (17.5, -71, 80),
    ]]
    chamfer(chamfer_7_edges, length=CHAMFER_7_SIZE - 0.0001)  # a hair under: the kernel refuses the full size

    # 모따기8
    chamfer_8_edges = [part.edges().sort_by_distance(p)[0] for p in [
        (-17.5, -52.984148708, 90),
        (17.5, -52.984148708, 90),
    ]]
    chamfer(chamfer_8_edges, length=CHAMFER_8_SIZE)


solid = part.part
